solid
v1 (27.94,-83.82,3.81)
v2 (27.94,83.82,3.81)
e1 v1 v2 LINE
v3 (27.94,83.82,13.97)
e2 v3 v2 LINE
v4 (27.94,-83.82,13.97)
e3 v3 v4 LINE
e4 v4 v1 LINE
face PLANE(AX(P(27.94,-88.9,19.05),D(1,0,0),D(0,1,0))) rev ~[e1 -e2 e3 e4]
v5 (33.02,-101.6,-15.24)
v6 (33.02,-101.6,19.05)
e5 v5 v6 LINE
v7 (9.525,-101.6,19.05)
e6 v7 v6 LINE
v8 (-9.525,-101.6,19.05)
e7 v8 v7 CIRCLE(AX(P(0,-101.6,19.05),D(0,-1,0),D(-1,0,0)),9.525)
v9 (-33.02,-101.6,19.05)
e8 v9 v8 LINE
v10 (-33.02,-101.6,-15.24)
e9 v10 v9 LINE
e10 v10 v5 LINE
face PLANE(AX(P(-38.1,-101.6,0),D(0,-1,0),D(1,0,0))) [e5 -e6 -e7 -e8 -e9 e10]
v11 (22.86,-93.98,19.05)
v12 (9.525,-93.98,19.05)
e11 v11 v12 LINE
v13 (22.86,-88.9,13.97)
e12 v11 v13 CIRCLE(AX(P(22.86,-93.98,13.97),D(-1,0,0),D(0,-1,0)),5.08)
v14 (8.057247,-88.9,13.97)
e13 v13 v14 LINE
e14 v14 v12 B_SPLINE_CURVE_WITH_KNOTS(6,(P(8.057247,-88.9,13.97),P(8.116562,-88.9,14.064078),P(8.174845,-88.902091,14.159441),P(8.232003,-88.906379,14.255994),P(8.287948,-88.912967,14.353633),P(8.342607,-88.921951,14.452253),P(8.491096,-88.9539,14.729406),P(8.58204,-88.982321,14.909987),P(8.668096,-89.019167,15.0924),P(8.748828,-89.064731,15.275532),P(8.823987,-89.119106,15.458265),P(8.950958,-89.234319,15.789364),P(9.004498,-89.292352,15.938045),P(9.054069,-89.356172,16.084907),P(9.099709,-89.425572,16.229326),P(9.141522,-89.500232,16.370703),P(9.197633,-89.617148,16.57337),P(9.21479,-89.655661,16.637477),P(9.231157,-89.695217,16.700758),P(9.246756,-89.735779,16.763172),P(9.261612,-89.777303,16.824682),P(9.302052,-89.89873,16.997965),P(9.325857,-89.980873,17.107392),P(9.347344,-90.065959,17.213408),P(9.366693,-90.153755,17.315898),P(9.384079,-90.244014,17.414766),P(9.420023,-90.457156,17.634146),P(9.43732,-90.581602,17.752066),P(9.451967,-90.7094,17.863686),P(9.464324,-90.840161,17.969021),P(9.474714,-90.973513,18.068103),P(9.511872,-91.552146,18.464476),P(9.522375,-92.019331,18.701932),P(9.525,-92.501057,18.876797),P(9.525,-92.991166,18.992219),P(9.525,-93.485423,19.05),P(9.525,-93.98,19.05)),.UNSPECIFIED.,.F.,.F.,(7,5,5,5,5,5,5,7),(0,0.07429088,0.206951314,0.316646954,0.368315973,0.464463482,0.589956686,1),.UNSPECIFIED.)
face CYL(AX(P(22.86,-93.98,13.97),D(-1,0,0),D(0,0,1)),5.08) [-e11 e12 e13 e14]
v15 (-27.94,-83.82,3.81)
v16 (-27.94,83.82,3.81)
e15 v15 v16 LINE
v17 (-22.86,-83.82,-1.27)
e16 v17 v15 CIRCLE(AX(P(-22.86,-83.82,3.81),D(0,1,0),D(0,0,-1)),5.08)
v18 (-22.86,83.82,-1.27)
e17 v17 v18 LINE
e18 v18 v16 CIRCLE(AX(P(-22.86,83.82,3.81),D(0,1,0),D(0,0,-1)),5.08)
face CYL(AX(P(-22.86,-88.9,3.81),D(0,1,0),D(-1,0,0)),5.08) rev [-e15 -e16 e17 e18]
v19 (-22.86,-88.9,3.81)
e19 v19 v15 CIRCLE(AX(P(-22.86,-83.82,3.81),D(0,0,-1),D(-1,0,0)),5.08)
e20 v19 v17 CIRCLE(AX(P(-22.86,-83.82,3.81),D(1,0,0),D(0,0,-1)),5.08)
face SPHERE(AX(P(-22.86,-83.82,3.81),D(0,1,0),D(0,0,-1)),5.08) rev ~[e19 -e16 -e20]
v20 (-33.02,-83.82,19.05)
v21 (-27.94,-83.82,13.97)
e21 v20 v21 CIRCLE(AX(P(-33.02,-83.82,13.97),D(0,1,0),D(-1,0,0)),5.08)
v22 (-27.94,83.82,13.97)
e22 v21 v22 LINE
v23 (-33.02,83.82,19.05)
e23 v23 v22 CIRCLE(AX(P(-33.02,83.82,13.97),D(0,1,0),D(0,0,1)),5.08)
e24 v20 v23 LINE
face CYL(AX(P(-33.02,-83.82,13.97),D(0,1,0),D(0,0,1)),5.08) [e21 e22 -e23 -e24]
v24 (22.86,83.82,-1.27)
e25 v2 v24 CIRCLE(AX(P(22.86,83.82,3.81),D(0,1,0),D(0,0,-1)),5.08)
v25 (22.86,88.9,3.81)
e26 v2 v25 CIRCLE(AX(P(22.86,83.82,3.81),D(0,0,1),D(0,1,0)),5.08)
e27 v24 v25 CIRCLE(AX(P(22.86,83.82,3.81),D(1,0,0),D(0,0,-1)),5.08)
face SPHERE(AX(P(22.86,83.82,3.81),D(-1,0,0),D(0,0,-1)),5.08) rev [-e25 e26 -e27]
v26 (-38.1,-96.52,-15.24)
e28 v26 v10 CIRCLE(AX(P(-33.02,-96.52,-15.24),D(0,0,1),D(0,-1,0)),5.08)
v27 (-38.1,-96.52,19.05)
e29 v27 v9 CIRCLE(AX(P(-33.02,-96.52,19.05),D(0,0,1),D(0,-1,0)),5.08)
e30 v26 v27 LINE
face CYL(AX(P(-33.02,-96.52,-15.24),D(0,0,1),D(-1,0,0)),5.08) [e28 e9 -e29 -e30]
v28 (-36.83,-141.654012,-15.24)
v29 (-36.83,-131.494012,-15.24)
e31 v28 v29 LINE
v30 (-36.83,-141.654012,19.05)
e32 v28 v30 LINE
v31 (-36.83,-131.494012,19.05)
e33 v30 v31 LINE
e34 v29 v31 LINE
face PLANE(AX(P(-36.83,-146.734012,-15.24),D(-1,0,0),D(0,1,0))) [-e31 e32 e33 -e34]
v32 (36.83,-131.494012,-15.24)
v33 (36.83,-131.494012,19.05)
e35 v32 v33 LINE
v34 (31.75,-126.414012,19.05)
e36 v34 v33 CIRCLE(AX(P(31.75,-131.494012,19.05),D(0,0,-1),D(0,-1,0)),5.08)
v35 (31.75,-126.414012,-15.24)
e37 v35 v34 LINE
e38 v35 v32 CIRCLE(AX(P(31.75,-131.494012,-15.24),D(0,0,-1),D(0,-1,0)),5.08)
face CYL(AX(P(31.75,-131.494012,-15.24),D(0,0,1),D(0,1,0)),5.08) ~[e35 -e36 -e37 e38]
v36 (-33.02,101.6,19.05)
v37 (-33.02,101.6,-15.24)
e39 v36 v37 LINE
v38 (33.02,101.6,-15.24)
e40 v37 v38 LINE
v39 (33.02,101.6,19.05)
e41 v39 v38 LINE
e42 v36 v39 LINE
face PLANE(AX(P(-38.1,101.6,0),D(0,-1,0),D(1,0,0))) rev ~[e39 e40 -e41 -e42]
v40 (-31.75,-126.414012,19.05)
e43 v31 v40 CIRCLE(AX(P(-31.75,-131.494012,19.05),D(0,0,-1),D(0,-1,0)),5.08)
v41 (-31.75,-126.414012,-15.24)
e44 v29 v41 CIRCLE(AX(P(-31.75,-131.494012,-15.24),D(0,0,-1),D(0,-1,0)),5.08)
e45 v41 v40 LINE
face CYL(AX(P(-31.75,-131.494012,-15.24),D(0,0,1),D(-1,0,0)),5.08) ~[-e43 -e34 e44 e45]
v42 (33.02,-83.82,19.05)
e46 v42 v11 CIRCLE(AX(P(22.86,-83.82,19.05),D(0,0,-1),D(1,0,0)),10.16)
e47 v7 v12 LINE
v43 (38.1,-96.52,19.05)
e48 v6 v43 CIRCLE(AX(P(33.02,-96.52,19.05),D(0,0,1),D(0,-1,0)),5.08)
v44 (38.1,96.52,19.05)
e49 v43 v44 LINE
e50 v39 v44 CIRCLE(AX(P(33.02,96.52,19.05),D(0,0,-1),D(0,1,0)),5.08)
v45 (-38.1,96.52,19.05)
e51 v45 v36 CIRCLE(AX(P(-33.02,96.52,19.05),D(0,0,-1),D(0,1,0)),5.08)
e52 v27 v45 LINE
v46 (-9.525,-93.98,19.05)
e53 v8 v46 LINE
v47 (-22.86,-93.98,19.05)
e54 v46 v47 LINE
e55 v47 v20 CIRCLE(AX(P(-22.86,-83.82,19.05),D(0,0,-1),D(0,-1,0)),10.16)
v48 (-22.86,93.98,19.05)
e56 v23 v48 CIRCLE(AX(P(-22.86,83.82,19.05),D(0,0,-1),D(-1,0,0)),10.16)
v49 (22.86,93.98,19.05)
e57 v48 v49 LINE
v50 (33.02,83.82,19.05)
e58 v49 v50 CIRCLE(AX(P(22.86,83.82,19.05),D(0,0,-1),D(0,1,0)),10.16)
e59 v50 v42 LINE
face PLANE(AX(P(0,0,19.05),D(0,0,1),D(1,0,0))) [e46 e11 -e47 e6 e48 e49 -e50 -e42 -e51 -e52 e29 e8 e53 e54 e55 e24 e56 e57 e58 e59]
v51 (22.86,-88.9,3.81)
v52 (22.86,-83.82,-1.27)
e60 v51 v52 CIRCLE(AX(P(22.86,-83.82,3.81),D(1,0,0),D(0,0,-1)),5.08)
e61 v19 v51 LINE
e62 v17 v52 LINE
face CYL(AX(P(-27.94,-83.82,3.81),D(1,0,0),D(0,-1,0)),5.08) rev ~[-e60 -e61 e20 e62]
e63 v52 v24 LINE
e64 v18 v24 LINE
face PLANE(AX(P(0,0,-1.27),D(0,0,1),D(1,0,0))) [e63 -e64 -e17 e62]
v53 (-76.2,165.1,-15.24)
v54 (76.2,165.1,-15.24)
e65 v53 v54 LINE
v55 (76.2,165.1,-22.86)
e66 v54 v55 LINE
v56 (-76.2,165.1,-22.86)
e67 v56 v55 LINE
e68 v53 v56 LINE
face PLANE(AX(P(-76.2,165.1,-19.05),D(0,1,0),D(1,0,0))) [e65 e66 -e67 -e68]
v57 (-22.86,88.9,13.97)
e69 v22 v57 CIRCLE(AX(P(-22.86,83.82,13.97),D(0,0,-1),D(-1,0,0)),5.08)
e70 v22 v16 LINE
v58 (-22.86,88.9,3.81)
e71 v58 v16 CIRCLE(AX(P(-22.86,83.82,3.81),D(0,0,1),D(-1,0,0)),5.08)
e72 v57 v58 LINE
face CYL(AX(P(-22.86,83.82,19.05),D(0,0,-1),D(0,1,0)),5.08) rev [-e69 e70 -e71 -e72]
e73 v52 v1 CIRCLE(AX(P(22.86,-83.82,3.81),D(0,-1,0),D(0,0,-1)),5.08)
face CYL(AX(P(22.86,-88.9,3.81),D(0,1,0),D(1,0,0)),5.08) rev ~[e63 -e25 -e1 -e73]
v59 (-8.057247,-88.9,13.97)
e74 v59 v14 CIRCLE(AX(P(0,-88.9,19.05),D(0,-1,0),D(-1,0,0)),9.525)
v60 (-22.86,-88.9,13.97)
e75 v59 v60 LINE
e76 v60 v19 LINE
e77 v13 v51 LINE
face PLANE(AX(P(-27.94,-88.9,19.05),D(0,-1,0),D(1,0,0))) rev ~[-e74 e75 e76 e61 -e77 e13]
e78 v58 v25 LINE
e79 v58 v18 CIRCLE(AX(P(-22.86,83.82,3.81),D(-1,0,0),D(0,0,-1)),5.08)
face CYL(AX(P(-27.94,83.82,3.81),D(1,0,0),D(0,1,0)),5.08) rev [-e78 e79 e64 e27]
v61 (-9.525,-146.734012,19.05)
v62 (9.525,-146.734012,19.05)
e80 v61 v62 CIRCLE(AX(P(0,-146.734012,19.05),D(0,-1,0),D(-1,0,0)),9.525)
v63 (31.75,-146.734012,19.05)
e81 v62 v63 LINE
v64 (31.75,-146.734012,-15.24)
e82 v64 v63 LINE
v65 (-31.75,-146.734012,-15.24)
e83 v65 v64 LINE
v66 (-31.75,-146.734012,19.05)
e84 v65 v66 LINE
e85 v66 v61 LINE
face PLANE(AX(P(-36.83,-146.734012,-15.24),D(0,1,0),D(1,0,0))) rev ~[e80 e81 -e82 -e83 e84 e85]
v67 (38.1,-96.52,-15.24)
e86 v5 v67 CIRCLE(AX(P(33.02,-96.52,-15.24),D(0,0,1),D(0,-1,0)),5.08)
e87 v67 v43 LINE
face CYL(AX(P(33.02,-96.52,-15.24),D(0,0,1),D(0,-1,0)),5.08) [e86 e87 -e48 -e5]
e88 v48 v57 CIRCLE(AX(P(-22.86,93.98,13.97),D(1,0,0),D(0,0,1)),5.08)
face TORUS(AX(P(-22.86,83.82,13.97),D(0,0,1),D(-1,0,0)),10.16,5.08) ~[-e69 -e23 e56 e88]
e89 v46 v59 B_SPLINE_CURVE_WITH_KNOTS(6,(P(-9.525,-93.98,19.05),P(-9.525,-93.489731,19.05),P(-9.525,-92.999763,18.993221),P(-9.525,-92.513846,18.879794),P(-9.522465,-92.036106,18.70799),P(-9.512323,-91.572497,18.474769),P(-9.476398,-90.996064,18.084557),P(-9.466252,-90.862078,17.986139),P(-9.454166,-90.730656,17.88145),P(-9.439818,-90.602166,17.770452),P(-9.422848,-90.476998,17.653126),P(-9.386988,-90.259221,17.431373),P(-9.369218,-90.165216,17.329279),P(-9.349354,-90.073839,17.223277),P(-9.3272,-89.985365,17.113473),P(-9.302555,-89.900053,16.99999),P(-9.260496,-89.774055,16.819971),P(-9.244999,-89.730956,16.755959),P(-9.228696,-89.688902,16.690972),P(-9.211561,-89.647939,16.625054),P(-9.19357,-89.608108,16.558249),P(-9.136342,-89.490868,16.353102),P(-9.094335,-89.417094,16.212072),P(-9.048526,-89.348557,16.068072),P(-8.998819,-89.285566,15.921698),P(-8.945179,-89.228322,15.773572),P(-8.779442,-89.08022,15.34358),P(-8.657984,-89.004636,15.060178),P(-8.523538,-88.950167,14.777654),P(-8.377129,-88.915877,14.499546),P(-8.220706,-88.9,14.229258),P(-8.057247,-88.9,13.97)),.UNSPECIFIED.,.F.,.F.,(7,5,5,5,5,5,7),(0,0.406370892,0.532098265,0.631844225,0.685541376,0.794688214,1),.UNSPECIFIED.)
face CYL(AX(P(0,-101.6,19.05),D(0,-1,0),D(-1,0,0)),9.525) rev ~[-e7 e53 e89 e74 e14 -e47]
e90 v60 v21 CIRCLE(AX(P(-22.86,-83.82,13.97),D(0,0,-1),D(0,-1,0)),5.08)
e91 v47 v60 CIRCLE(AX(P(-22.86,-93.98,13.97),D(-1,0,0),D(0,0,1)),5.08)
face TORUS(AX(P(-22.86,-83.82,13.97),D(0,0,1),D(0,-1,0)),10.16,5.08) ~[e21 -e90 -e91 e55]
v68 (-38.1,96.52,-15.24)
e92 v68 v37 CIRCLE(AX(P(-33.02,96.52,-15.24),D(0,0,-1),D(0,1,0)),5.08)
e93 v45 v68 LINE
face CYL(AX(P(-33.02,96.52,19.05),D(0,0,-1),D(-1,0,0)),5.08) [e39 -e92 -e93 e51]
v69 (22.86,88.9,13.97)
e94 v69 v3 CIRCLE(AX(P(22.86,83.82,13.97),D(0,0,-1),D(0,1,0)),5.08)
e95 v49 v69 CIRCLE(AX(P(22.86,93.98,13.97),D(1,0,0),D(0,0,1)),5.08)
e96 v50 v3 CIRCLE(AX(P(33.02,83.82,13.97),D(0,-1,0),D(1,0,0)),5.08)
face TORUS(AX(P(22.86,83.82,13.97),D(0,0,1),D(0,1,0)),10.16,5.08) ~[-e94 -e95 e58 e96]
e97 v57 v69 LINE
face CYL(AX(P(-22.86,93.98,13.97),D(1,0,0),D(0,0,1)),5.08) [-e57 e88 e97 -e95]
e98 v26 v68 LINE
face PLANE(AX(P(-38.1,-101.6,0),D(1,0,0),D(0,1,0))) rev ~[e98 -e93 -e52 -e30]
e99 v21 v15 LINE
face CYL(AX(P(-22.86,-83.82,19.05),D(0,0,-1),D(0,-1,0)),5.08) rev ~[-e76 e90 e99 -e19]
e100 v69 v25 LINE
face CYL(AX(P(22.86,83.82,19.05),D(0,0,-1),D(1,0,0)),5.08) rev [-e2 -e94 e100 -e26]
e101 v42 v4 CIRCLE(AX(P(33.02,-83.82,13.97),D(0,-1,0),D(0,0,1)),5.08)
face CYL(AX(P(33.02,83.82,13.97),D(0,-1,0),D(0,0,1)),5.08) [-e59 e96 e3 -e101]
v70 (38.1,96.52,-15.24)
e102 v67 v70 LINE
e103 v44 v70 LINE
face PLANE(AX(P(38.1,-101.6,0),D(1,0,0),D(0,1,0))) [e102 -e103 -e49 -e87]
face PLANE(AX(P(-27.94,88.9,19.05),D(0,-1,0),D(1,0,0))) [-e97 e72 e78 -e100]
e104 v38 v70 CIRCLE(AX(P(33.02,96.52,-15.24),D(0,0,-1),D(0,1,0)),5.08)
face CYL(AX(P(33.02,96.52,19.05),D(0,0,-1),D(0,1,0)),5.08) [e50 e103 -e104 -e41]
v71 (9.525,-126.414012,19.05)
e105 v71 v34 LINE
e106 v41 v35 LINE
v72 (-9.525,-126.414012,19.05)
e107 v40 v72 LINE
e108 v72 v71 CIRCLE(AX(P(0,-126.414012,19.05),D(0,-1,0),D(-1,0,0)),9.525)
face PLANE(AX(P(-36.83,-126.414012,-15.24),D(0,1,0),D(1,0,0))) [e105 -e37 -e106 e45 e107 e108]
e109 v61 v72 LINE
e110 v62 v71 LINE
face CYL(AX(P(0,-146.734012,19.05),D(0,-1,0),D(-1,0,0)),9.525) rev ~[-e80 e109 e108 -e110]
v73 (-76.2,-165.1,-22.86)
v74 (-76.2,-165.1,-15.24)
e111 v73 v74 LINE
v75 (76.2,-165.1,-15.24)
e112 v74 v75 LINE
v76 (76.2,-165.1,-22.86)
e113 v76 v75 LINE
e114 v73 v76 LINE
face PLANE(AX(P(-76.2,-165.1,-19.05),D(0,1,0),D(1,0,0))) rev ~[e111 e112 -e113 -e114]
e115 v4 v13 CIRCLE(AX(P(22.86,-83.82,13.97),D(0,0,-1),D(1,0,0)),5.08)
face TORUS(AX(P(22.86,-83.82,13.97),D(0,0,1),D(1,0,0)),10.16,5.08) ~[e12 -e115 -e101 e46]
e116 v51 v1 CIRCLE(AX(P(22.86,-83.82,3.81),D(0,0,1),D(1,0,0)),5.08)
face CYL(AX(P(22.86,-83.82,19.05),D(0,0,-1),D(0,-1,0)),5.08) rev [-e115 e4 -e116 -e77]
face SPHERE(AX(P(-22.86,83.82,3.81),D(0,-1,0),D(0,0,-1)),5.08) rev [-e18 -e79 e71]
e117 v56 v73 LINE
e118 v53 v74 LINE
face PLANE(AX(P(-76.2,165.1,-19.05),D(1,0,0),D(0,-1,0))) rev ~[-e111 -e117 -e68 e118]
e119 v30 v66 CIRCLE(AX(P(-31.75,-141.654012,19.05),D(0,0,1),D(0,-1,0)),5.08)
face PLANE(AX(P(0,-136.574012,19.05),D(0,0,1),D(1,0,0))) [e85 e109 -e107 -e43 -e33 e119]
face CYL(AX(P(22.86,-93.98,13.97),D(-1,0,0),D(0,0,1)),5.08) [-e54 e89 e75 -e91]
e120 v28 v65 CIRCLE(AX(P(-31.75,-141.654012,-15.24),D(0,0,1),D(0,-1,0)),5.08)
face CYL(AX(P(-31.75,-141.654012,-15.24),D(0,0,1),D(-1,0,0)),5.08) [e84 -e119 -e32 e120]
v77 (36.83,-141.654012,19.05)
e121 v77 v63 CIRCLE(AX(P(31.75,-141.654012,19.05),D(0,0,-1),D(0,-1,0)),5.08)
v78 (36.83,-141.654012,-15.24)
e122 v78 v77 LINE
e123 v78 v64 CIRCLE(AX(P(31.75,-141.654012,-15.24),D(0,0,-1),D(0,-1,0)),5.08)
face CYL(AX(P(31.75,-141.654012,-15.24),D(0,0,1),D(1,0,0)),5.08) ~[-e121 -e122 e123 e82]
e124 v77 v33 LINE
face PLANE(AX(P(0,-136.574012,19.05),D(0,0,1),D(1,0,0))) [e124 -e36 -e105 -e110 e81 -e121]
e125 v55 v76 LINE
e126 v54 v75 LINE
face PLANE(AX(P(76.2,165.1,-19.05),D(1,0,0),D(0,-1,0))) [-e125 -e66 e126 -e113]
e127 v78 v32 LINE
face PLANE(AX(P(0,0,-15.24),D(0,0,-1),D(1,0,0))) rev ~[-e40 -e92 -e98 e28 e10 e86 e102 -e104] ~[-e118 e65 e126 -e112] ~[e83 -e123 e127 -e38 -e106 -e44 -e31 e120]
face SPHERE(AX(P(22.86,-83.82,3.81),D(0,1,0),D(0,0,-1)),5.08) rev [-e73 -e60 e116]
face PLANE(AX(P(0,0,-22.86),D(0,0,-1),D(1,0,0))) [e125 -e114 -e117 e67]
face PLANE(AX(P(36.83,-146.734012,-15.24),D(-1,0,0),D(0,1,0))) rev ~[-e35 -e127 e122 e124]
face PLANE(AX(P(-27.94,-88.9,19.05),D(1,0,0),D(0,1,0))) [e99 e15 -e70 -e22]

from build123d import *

# Parameters (mm, degrees)
F0_W      = 76.2
F0_H      = 203.2
F1_DEPTH  = 19.05
F2_W      = 55.88
F2_H      = 177.8
F3_DEPTH  = 20.32
F4_F1_R   = 5.08
F4_F2_R   = 5.08
F6_DEPTH  = 25.4
F7_W      = 152.4
F7_H      = 330.2
F7_W_2    = 76.2
F7_H_2    = 203.2
F8_DEPTH  = 3.81
F9_W      = 73.66
F9_H      = 20.32
F10_DEPTH = 34.29
F12_DEPTH = 25.4
F13_R     = 5.08


with BuildPart() as f1:
    # F0 (on Top) → F1 (new body, symmetric)
    with BuildSketch(Plane.XY):
        Rectangle(F0_W, F0_H)
    extrude(amount=F1_DEPTH, both=True)

    # F2 (on face) → F3 (cut)
    with BuildSketch(Plane.XY.offset(19.05)):
        Rectangle(F2_W, F2_H)
    extrude(amount=-F3_DEPTH, mode=Mode.SUBTRACT)

    # F4: fillet of radius 5.08 on 9 edges, made by hand

    # F4_f1
    f4_f1_edges = [f1.edges().sort_by_distance(p)[0] for p in [
        (-27.94, 0, -1.27),
        (0, 88.9, -1.27),
        (27.94, 0, -1.27),
        (0, -88.9, -1.27),
        (-27.94, 88.9, 8.89),
        (27.94, 88.9, 8.89),
        (27.94, -88.9, 8.89),
        (-27.94, -88.9, 8.89),
    ]]
    fillet(f4_f1_edges, radius=F4_F1_R)

    # F4_f2
    f4_f2_edges = [f1.edges().sort_by_distance(p)[0] for p in [
        (0, 88.9, 19.05),
        (26.4521024484, 87.4121024484, 19.05),
        (-26.4521024484, 87.4121024484, 19.05),
    ]]
    fillet(f4_f2_edges, radius=F4_F2_R)

    # F5 (on face) → F6 (cut)
    with BuildSketch(Plane.XZ.offset(101.6)):
        with BuildLine():
            Line((9.525, 19.05), (-9.525, 19.05))
            ThreePointArc((-9.525, 19.05), (0, 9.525), (9.525, 19.05))
        make_face()
    extrude(amount=-F6_DEPTH, mode=Mode.SUBTRACT)

    # F7 (on face) → F8 (join, symmetric)
    with BuildSketch(Plane(origin=(0, 0, -19.05), x_dir=(1, 0, 0), z_dir=(0, 0, -1))):
        Rectangle(F7_W, F7_H)
        Rectangle(F7_W_2, F7_H_2, mode=Mode.SUBTRACT)
        Rectangle(F7_W_2, F7_H_2)
    extrude(amount=F8_DEPTH, both=True)

    # F9 (on face) → F10 (join)
    with BuildSketch(Plane.XY.offset(-15.24)):
        with Locations((0, -136.5740124)):
            Rectangle(F9_W, F9_H)
    extrude(amount=F10_DEPTH)

    # F11 (on face) → F12 (cut)
    with BuildSketch(Plane.XZ.offset(146.7340124)):
        with BuildLine():
            Line((9.525, 19.05), (-9.525, 19.05))
            ThreePointArc((-9.525, 19.05), (0, 9.525), (9.525, 19.05))
        make_face()
    extrude(amount=-F12_DEPTH, mode=Mode.SUBTRACT)

    # F13
    f13_edges = [f1.edges().sort_by_distance(p)[0] for p in [
        (38.1, -101.6, 1.905),
        (36.83, -126.414012, 1.905),
        (36.83, -146.734012, 1.905),
        (-36.83, -146.734012, 1.905),
        (-36.83, -126.414012, 1.905),
        (-38.1, -101.6, 1.905),
        (38.1, 101.6, 1.905),
        (-38.1, 101.6, 1.905),
    ]]
    fillet(f13_edges, radius=F13_R)


solid = f1.part
